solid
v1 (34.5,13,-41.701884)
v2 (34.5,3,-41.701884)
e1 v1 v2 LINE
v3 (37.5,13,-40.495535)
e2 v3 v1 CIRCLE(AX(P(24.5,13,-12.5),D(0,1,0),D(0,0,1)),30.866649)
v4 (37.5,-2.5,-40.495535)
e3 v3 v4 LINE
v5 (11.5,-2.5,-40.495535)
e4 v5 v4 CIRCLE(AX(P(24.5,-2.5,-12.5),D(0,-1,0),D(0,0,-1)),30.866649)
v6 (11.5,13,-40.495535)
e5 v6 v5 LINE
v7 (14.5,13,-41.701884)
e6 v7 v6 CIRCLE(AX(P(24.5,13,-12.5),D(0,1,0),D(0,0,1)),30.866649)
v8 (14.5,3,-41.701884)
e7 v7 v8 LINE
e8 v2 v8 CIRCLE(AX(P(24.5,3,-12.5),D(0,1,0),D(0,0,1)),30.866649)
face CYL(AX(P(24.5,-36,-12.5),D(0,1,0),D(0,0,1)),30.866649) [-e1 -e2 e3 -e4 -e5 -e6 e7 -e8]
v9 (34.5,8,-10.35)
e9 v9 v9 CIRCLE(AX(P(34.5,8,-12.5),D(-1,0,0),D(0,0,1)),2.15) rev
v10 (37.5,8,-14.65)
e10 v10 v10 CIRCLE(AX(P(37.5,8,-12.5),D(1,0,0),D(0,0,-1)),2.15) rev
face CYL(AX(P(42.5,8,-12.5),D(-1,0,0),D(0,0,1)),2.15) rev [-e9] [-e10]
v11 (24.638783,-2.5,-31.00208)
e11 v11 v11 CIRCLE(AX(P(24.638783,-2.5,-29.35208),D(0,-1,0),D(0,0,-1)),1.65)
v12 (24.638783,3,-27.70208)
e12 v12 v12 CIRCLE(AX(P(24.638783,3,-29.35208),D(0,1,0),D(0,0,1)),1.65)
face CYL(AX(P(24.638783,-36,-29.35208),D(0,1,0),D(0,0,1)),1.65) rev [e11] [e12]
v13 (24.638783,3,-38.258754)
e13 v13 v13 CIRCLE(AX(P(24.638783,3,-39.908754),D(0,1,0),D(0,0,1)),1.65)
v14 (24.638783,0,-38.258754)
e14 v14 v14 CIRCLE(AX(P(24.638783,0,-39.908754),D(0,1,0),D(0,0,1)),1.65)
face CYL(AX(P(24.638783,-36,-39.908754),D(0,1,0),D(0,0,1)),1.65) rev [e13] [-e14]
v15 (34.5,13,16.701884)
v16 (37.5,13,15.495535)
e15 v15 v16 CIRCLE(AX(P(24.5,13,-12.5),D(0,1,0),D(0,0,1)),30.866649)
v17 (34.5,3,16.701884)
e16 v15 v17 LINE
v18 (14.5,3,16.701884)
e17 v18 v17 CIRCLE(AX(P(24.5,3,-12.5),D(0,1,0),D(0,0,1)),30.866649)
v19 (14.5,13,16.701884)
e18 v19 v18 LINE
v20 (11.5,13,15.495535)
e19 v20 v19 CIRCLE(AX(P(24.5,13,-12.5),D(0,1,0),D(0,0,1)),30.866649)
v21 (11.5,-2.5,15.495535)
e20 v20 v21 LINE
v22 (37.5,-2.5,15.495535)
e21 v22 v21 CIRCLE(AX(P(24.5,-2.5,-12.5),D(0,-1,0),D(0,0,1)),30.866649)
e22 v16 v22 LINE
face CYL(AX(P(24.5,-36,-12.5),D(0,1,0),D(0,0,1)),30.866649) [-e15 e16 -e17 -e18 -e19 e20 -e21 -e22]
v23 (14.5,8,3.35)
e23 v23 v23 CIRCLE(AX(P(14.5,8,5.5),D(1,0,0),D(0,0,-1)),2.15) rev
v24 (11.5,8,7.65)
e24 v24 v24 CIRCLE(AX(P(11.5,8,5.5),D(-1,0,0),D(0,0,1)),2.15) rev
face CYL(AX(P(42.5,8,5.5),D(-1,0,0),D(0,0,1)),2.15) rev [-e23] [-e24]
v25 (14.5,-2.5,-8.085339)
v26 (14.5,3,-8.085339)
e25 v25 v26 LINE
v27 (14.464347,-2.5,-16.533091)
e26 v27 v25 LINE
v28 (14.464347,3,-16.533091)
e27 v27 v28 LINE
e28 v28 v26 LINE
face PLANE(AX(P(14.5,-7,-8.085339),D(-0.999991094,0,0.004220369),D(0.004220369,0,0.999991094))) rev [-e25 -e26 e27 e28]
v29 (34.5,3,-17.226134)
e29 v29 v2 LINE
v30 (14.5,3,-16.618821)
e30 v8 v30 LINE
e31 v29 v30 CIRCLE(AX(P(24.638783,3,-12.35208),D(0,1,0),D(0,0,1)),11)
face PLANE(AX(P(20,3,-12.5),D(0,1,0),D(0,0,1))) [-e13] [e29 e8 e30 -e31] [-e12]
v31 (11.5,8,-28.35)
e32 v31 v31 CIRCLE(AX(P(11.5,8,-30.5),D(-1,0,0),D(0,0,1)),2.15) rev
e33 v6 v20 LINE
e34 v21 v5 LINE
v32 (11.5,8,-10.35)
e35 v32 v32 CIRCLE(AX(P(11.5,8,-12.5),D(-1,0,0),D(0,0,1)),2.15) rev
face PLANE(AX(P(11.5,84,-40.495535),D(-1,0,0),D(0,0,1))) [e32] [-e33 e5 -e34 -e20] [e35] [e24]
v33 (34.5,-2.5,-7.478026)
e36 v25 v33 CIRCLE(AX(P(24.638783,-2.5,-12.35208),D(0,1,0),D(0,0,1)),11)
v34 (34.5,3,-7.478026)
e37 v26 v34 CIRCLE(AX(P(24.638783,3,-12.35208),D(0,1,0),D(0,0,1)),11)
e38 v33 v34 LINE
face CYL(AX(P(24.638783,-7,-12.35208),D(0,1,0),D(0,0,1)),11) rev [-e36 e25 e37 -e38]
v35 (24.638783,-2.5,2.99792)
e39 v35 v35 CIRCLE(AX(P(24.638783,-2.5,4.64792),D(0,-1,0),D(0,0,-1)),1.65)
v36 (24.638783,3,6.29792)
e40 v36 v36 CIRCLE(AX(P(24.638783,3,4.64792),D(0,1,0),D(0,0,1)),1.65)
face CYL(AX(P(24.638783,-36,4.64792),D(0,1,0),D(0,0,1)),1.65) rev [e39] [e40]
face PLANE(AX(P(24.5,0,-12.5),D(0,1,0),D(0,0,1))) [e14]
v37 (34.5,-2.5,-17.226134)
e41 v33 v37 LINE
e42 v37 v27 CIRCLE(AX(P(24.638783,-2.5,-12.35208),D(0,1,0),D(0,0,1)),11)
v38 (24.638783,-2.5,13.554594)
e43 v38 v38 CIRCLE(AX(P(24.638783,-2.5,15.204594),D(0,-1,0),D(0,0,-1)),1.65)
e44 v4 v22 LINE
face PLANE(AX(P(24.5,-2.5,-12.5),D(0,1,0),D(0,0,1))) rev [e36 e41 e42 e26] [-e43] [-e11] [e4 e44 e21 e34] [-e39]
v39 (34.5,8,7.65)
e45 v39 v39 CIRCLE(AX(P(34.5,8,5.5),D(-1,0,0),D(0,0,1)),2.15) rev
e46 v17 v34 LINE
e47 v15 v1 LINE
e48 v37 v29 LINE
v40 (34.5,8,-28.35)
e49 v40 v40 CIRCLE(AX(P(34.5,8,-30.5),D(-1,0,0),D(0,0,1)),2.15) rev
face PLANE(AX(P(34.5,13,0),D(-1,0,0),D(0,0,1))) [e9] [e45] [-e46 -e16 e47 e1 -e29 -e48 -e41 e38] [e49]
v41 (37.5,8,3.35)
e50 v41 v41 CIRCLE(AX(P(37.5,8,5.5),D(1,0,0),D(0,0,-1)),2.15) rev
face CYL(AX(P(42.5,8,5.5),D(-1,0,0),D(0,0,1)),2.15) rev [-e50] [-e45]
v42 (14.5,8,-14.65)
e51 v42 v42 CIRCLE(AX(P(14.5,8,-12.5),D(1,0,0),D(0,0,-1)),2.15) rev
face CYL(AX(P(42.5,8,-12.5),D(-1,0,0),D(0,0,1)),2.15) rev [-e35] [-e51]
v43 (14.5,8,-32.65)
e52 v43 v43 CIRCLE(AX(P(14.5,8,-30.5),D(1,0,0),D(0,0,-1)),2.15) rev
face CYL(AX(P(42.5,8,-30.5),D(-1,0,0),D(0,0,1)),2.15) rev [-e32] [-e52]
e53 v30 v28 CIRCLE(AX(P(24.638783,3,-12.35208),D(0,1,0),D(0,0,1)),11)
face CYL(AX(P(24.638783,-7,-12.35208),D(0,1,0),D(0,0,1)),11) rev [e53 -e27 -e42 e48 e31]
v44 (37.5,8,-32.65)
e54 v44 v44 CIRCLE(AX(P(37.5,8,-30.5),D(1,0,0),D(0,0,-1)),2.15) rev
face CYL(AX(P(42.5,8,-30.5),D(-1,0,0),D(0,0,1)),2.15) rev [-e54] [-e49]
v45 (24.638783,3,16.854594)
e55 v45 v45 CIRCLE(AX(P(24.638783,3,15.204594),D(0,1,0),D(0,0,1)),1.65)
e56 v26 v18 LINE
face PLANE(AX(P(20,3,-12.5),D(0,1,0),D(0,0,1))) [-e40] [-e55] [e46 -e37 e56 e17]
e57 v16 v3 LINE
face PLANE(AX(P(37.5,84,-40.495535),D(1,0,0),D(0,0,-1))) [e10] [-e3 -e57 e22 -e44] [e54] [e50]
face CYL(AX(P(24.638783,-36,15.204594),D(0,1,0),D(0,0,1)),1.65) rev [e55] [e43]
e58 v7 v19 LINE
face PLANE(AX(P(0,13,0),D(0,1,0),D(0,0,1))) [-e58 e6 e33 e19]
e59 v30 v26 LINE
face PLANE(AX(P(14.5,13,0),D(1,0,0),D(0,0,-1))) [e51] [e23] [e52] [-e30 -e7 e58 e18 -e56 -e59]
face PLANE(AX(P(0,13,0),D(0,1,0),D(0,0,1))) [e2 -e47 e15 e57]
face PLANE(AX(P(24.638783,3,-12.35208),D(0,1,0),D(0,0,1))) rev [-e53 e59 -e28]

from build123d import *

# Parameters (mm, degrees)
SKETCH1_R                = 28
BOSS_EXTRUDE1_DEPTH      = 3
SKETCH2_R                = 1.625
CUT_EXTRUDE1_DEPTH       = 3
BOSS_EXTRUDE4_START      = 3
BOSS_EXTRUDE4_OUTLINE_R  = 1.625
BOSS_EXTRUDE4_DEPTH      = 70
BOSS_EXTRUDE6_DEPTH      = 7
CUT_EXTRUDE13_START      = -10
CUT_EXTRUDE13_DEPTH      = 10
SKETCH14_R               = 6
CUT_EXTRUDE7_DEPTH       = 4
SKETCH15_R               = 5
CUT_EXTRUDE8_DEPTH       = 37
SKETCH17_R               = 2.15
CUT_EXTRUDE10_DEPTH      = 15.8
CUT_EXTRUDE11_DEPTH      = 5
CUT_EXTRUDE12_START      = -3
CUT_EXTRUDE12_DEPTH      = 3
SKETCH21_W               = 20.621892052
SKETCH21_H               = 10
BOSS_EXTRUDE7_DEPTH      = 7
SKETCH23_R               = 2.15
CUT_EXTRUDE17_DEPTH      = 23
SKETCH25_W               = 2
SKETCH25_H               = 4.7
CUT_EXTRUDE19_DEPTH      = 5
SKETCH26_W               = 20.621892052
SKETCH26_H               = 58
CUT_EXTRUDE21_DEPTH      = 5
CUT_EXTRUDE22_DEPTH      = 5
SKETCH41_R               = 1.625
CUT_EXTRUDE23_DEPTH      = 70
CUT_EXTRUDE24_START      = -39
CUT_EXTRUDE24_DEPTH      = 39
BOSS_EXTRUDE12_START     = -3
SKETCH43_R               = 30.866648668
BOSS_EXTRUDE12_DEPTH     = 3
BOSS_EXTRUDE13_DEPTH     = 70
BOSS_EXTRUDE14_DEPTH     = 70
SKETCH47_R               = 1.65
SKETCH47_R_2             = 1.625
CUT_EXTRUDE26_DEPTH      = 39
SKETCH48_R               = 5
CUT_EXTRUDE27_DEPTH      = 39
SKETCH49_R               = 5
CUT_EXTRUDE28_DEPTH      = 10
CUT_EXTRUDE29_START      = -4
SKETCH50_R               = 6
CUT_EXTRUDE29_DEPTH      = 4
SKETCH51_R               = 3
CUT_EXTRUDE30_DEPTH      = 2.5
CUT_EXTRUDE31_DEPTH      = 81
CUT_EXTRUDE31_DEPTH_BACK = 10
BOSS_EXTRUDE15_DEPTH     = 10
CUT_EXTRUDE32_DEPTH      = 28
CUT_EXTRUDE32_DEPTH_BACK = 12
SKETCH54_R               = 2.15
SKETCH55_R               = 1.65
BOSS_EXTRUDE16_DEPTH     = 2.5
CUT_EXTRUDE33_DEPTH      = 10


# Read off the part's stored shape, not the designer's step: Boss-Extrude4, Cut-Extrude13
with BuildPart() as part:
    # Sketch1 → Boss-Extrude1 (new body)
    with BuildSketch(Plane(origin=(0, 0, 0), x_dir=(1, 0, 0), z_dir=(0, 1, 0))):
        with Locations(Location((20, 12.5, 0), (0, 0, 270))):
            Circle(SKETCH1_R)
    extrude(amount=BOSS_EXTRUDE1_DEPTH)

    # Sketch2 → Cut-Extrude1 (cut)
    with BuildSketch(Plane(origin=(0, 3, 0), x_dir=(1, 0, 0), z_dir=(0, 1, 0))):
        with Locations(Location((20, 19.5, 0), (0, 0, 270))):
            Circle(SKETCH2_R)
        with Locations(Location((20, 5.5, 0), (0, 0, 270))):
            Circle(SKETCH2_R)
        with Locations(Location((20, 12.5, 0), (0, 0, 270))):
            Circle(SKETCH2_R)
    extrude(amount=-CUT_EXTRUDE1_DEPTH, mode=Mode.SUBTRACT)

    # Boss-Extrude4 outline → Boss-Extrude4 (add)
    with BuildSketch(Plane(origin=(0, 0, 0), x_dir=(1, 0, 0), z_dir=(0, 1, 0)).offset(BOSS_EXTRUDE4_START)):
        with BuildLine():
            ThreePointArc((3.5, -10.121892052), (48, 12.5), (3.5, 35.121892052))
            Line((3.5, 35.121892052), (3.5, -10.121892052))
        make_face()
        with Locations((20, 5.5)):
            Circle(BOSS_EXTRUDE4_OUTLINE_R, mode=Mode.SUBTRACT)
        with Locations((20, 12.5)):
            Circle(BOSS_EXTRUDE4_OUTLINE_R, mode=Mode.SUBTRACT)
        with Locations((20, 19.5)):
            Circle(BOSS_EXTRUDE4_OUTLINE_R, mode=Mode.SUBTRACT)
    extrude(amount=BOSS_EXTRUDE4_DEPTH)

    # Sketch13 → Boss-Extrude6 (add)
    with BuildSketch(Plane.ZY.offset(-3.5)):
        Polygon((-10, 23), (10, 23), (10.121892052, 23), (10.121892052, 15), (10, 15), (-10, 15), (-10.5, 15), (-10.5, 23), align=None)
    extrude(amount=BOSS_EXTRUDE6_DEPTH)

    # Cut-Extrude13 outline → Cut-Extrude13 (cut)
    with BuildSketch(Plane.ZY.offset(-3.5).offset(CUT_EXTRUDE13_START)):
        with BuildLine():
            Line((-10.5, 33), (-10.5, 23))
            Line((-10.5, 23), (10.121892052, 23))
            Line((10.121892052, 23), (10.121892052, 35.792364821))
            ThreePointArc((10.121892052, 35.792364821), (-1.408923961, 43.405043646), (-10.5, 33))
        make_face()
    extrude(amount=CUT_EXTRUDE13_DEPTH, mode=Mode.SUBTRACT)

    # Sketch14 → Cut-Extrude7 (cut)
    with BuildSketch(Plane.ZY.offset(-3.5)):
        with Locations((-22.981333294, 52.283628291)):
            Circle(SKETCH14_R)
    extrude(amount=-CUT_EXTRUDE7_DEPTH, mode=Mode.SUBTRACT)

    # Sketch15 → Cut-Extrude8 (cut)
    with BuildSketch(Plane.ZY.offset(-7.5)):
        with Locations((-22.981333294, 52.283628291)):
            Circle(SKETCH15_R)
    extrude(amount=-CUT_EXTRUDE8_DEPTH, mode=Mode.SUBTRACT)

    # Sketch17 → Cut-Extrude10 (cut)
    with BuildSketch(Plane.ZY.offset(3.5)):
        with Locations((-5, 18.2)):
            Circle(SKETCH17_R)
        with Locations((5, 18.2)):
            Circle(SKETCH17_R)
    extrude(amount=-CUT_EXTRUDE10_DEPTH, mode=Mode.SUBTRACT)

    # Sketch18 → Cut-Extrude11 (cut)
    with BuildSketch(Plane.ZY.offset(3.5)):
        Polygon((-0.189053974, 23), (1, 23), (1, 18), (-1, 18), (-1, 23), align=None)
    extrude(amount=-CUT_EXTRUDE11_DEPTH, mode=Mode.SUBTRACT)

    # Sketch19 → Cut-Extrude12 (cut)
    with BuildSketch(Plane.ZY.offset(-3.5).offset(CUT_EXTRUDE12_START)):
        with BuildLine():
            Line((10.121892052, 63), (10.121892052, 35.792364821))
            ThreePointArc((10.121892052, 35.792364821), (-1.408923961, 43.405043646), (-10.5, 33))
            Line((-10.5, 33), (-10.5, 62))
            Line((-10.5, 62), (-10.5, 63))
            Line((-10.5, 63), (10.121892052, 63))
        make_face()
    extrude(amount=CUT_EXTRUDE12_DEPTH, mode=Mode.SUBTRACT)

    # Sketch21 → Boss-Extrude7 (add)
    with BuildSketch(Plane.ZY.offset(-3.5)):
        with Locations((-0.189053974, 68)):
            Rectangle(SKETCH21_W, SKETCH21_H)
    extrude(amount=BOSS_EXTRUDE7_DEPTH)

    # Sketch23 → Cut-Extrude17 (cut)
    with BuildSketch(Plane.ZY.offset(3.5)):
        with Locations((-5, 67.7)):
            Circle(SKETCH23_R)
        with Locations((5, 67.7)):
            Circle(SKETCH23_R)
    extrude(amount=-CUT_EXTRUDE17_DEPTH, mode=Mode.SUBTRACT)

    # Sketch25 → Cut-Extrude19 (cut)
    with BuildSketch(Plane.ZY.offset(3.5)):
        with Locations((0, 65.35)):
            Rectangle(SKETCH25_W, SKETCH25_H)
    extrude(amount=-CUT_EXTRUDE19_DEPTH, mode=Mode.SUBTRACT)

    # Sketch26 → Cut-Extrude21 (cut)
    with BuildSketch(Plane.ZY.offset(3.5)):
        with Locations((-0.189053974, 44)):
            Rectangle(SKETCH26_W, SKETCH26_H)
    extrude(amount=-CUT_EXTRUDE21_DEPTH, mode=Mode.SUBTRACT)

    # Sketch27 → Cut-Extrude22 (cut)
    with BuildSketch(Plane.ZY.offset(-6.5)):
        Polygon((10.121892052, 63), (-10.5, 63), (-10.5, 33), (10.121892052, 35.792364821), align=None)
    extrude(amount=-CUT_EXTRUDE22_DEPTH, mode=Mode.SUBTRACT)

    # Sketch41 → Cut-Extrude23 (cut)
    with BuildSketch(Plane(origin=(0, 73, 0), x_dir=(1, 0, 0), z_dir=(0, 1, 0))):
        with BuildLine():
            Line((11.5, 39.178643144), (11.5, 10.5))
            Line((11.5, 10.5), (11.5, -14.178643144))
            ThreePointArc((11.5, -14.178643144), (48, 12.5), (11.5, 39.178643144))
        make_face()
        with Locations(Location((20, 5.5, 0), (0, 0, 270))):
            Circle(SKETCH41_R, mode=Mode.SUBTRACT)
        with Locations(Location((20, 12.5, 0), (0, 0, 270))):
            Circle(SKETCH41_R, mode=Mode.SUBTRACT)
        with Locations(Location((20, 19.5, 0), (0, 0, 270))):
            Circle(SKETCH41_R, mode=Mode.SUBTRACT)
    extrude(amount=-CUT_EXTRUDE23_DEPTH, mode=Mode.SUBTRACT)

    # Sketch42 → Cut-Extrude24 (cut)
    with BuildSketch(Plane(origin=(0, 3, 0), x_dir=(1, 0, 0), z_dir=(0, 1, 0)).offset(CUT_EXTRUDE24_START)):
        with BuildLine():
            ThreePointArc((3.5, 35.121892052), (-6.366648668, 12.5), (3.5, -10.121892052))
            ThreePointArc((3.5, -10.121892052), (-8, 12.5), (3.5, 35.121892052))
        make_face()
    extrude(amount=CUT_EXTRUDE24_DEPTH, mode=Mode.SUBTRACT)

    # Sketch43 → Boss-Extrude12 (add)
    with BuildSketch(Plane(origin=(0, 3, 0), x_dir=(1, 0, 0), z_dir=(0, 1, 0)).offset(BOSS_EXTRUDE12_START)):
        with Locations(Location((24.5, 12.5, 0), (0, 0, 270))):
            Circle(SKETCH43_R)
    extrude(amount=BOSS_EXTRUDE12_DEPTH)

    # Sketch45 → Boss-Extrude13 (add)
    with BuildSketch(Plane(origin=(0, 3, 0), x_dir=(1, 0, 0), z_dir=(0, 1, 0))):
        with BuildLine():
            Line((11.5, 40.495535358), (11.5, 39.178643144))
            ThreePointArc((11.5, 39.178643144), (7.336497035, 37.472698946), (3.5, 35.121892052))
            ThreePointArc((3.5, 35.121892052), (7.288985777, 38.12286068), (11.5, 40.495535358))
        make_face()
        with BuildLine():
            Line((11.5, -14.178643144), (11.5, -15.495535358))
            ThreePointArc((11.5, -15.495535358), (7.288985777, -13.12286068), (3.5, -10.121892052))
            ThreePointArc((3.5, -10.121892052), (7.336497035, -12.472698946), (11.5, -14.178643144))
        make_face()
    extrude(amount=BOSS_EXTRUDE13_DEPTH)

    # Sketch46 → Boss-Extrude14 (add)
    with BuildSketch(Plane(origin=(0, 3, 0), x_dir=(1, 0, 0), z_dir=(0, 1, 0))):
        with BuildLine():
            Line((37.5, 40.495535358), (37.5, 12.5))
            Line((37.5, 12.5), (37.5, -15.495535358))
            ThreePointArc((37.5, -15.495535358), (41.711014223, -13.12286068), (45.5, -10.121892052))
            Line((45.5, -10.121892052), (45.5, 12.5))
            Line((45.5, 12.5), (45.5, 35.121892052))
            ThreePointArc((45.5, 35.121892052), (41.711014223, 38.12286068), (37.5, 40.495535358))
        make_face()
    extrude(amount=BOSS_EXTRUDE14_DEPTH)

    # Sketch47 → Cut-Extrude26 (cut)
    with BuildSketch(Plane(origin=(0, 3, 0), x_dir=(1, 0, 0), z_dir=(0, 1, 0))):
        with Locations(Location((24.638783134, 29.352080003, 0), (0, 0, 270))):
            Circle(SKETCH47_R)
        with Locations(Location((24.638783134, 19.352080003, 0), (0, 0, 270))):
            Circle(SKETCH47_R)
        with Locations(Location((24.638783134, 12.352080003, 0), (0, 0, 270))):
            Circle(SKETCH47_R)
        with Locations(Location((24.638783134, -4.647919997, 0), (0, 0, 270))):
            Circle(SKETCH47_R)
        with Locations(Location((24.638783134, 5.352080003, 0), (0, 0, 270))):
            Circle(SKETCH47_R)
        with Locations(Location((48.503562926, 26.13041704, 0), (0, 0, 270))):
            Circle(SKETCH47_R)
        with Locations(Location((48.503562926, -1.426257034, 0), (0, 0, 270))):
            Circle(SKETCH47_R)
        with Locations(Location((24.638783134, -15.204594071, 0), (0, 0, 270))):
            Circle(SKETCH47_R)
        with Locations(Location((0.774003343, -1.426257034, 0), (0, 0, 270))):
            Circle(SKETCH47_R)
        with Locations(Location((0.774003343, 26.13041704, 0), (0, 0, 270))):
            Circle(SKETCH47_R)
        with Locations(Location((24.638783134, 39.908754076, 0), (0, 0, 270))):
            Circle(SKETCH47_R)
        with Locations(Location((-2.490624188, 12.352080003, 0), (0, 0, 270))):
            Circle(SKETCH47_R_2)
        with Locations(Location((51.768190456, 12.352080003, 0), (0, 0, 270))):
            Circle(SKETCH47_R_2)
        with Locations(Location((31.638783134, 12.352080003, 0), (0, 0, 270))):
            Circle(SKETCH47_R)
        with Locations(Location((17.638783134, 12.352080003, 0), (0, 0, 270))):
            Circle(SKETCH47_R)
    extrude(amount=-CUT_EXTRUDE26_DEPTH, mode=Mode.SUBTRACT)

    # Sketch48 → Cut-Extrude27 (cut)
    with BuildSketch(Plane.ZY.offset(-7.5)):
        with Locations((-22.981333294, 52.283628291)):
            Circle(SKETCH48_R)
    extrude(amount=-CUT_EXTRUDE27_DEPTH, mode=Mode.SUBTRACT)

    # Sketch49 → Cut-Extrude28 (cut)
    with BuildSketch(Plane(origin=(45.5, 0, 0), x_dir=(0, 0, -1), z_dir=(1, 0, 0))):
        with Locations((0, 33)):
            Circle(SKETCH49_R)
    extrude(amount=-CUT_EXTRUDE28_DEPTH, mode=Mode.SUBTRACT)

    # Sketch50 → Cut-Extrude29 (cut)
    with BuildSketch(Plane(origin=(45.5, 0, 0), x_dir=(0, 0, -1), z_dir=(1, 0, 0)).offset(CUT_EXTRUDE29_START)):
        with Locations((0, 33)):
            Circle(SKETCH50_R)
        with Locations(Location((22.981333294, 52.283628291, 0), (0, 0, 180))):
            Circle(SKETCH50_R)
    extrude(amount=CUT_EXTRUDE29_DEPTH, mode=Mode.SUBTRACT)

    # Sketch51 → Cut-Extrude30 (cut)
    with BuildSketch(Plane(origin=(11.5, 0, 0), x_dir=(0, 0, -1), z_dir=(1, 0, 0))):
        with Locations((-5, 18.2)):
            Circle(SKETCH51_R)
        with Locations((5, 18.2)):
            Circle(SKETCH51_R)
        with Locations((-5, 67.7)):
            Circle(SKETCH51_R)
        with Locations((5, 67.7)):
            Circle(SKETCH51_R)
    extrude(amount=-CUT_EXTRUDE30_DEPTH, mode=Mode.SUBTRACT)

    # Sketch52 → Cut-Extrude31 (cut, two sides: drawn at the far end of the back side and taken through both)
    with BuildSketch(Plane(origin=(0, 3, 0), x_dir=(1, 0, 0), z_dir=(0, 1, 0)).offset(-CUT_EXTRUDE31_DEPTH_BACK)):
        with BuildLine():
            Line((11.5, 40.495535358), (11.5, -15.495535358))
            ThreePointArc((11.5, -15.495535358), (-6.366648668, 12.5), (11.5, 40.495535358))
        make_face()
        with BuildLine():
            Line((37.5, 40.495535358), (37.5, -15.495535358))
            ThreePointArc((37.5, -15.495535358), (55.366648668, 12.5), (37.5, 40.495535358))
        make_face()
    extrude(amount=CUT_EXTRUDE31_DEPTH + CUT_EXTRUDE31_DEPTH_BACK, mode=Mode.SUBTRACT)


with BuildPart() as body_2:
    # of the pieces the cut leaves, the one that is kept (cut_extrude31_keep)
    add(part.part.solids().sort_by_distance((11.5, 0, 15.495535358))[0])

    # Sketch53 → Boss-Extrude15 (add)
    with BuildSketch(Plane(origin=(0, 3, 0), x_dir=(1, 0, 0), z_dir=(0, 1, 0))):
        with BuildLine():
            ThreePointArc((14.5, 41.701883501), (12.984192648, 41.138019852), (11.5, 40.495535358))
            Line((11.5, 40.495535358), (11.5, -15.495535358))
            ThreePointArc((11.5, -15.495535358), (12.984192648, -16.138019852), (14.5, -16.701883501))
            Line((14.5, -16.701883501), (14.5, 12.5))
            Line((14.5, 12.5), (14.5, 41.701883501))
        make_face()
        with BuildLine():
            ThreePointArc((37.5, 40.495535358), (36.015807352, 41.138019852), (34.5, 41.701883501))
            Line((34.5, 41.701883501), (34.5, 12.5))
            Line((34.5, 12.5), (34.5, -16.701883501))
            ThreePointArc((34.5, -16.701883501), (36.015807352, -16.138019852), (37.5, -15.495535358))
            Line((37.5, -15.495535358), (37.5, 40.495535358))
        make_face()
    extrude(amount=BOSS_EXTRUDE15_DEPTH)

    # Sketch54 → Cut-Extrude32 (cut, two sides: drawn at the far end of the back side and taken through both)
    with BuildSketch(Plane(origin=(14.5, 0, 0), x_dir=(0, 0, -1), z_dir=(1, 0, 0)).offset(-CUT_EXTRUDE32_DEPTH_BACK)):
        with Locations(Location((-5.5, 8, 0), (0, 0, 180))):
            Circle(SKETCH54_R)
        with Locations(Location((12.5, 8, 0), (0, 0, 180))):
            Circle(SKETCH54_R)
        with Locations(Location((30.5, 8, 0), (0, 0, 180))):
            Circle(SKETCH54_R)
    extrude(amount=CUT_EXTRUDE32_DEPTH + CUT_EXTRUDE32_DEPTH_BACK, mode=Mode.SUBTRACT)

    # Sketch55 → Boss-Extrude16 (add)
    with BuildSketch(Plane.XZ):
        with BuildLine():
            Line((11.5, 15.495535358), (11.5, -40.495535358))
            ThreePointArc((11.5, -40.495535358), (24.5, -43.366648668), (37.5, -40.495535358))
            Line((37.5, -40.495535358), (37.5, 15.495535358))
            ThreePointArc((37.5, 15.495535358), (24.5, 18.366648668), (11.5, 15.495535358))
        make_face()
        with Locations(Location((17.638783134, -12.352080003, 0), (0, 0, 90))):
            Circle(SKETCH55_R, mode=Mode.SUBTRACT)
        with Locations(Location((24.638783134, 15.204594071, 0), (0, 0, 90))):
            Circle(SKETCH55_R, mode=Mode.SUBTRACT)
        with Locations(Location((24.638783134, 4.647919997, 0), (0, 0, 90))):
            Circle(SKETCH55_R, mode=Mode.SUBTRACT)
        with Locations(Location((24.638783134, -5.352080003, 0), (0, 0, 90))):
            Circle(SKETCH55_R, mode=Mode.SUBTRACT)
        with Locations(Location((24.638783134, -12.352080003, 0), (0, 0, 90))):
            Circle(SKETCH55_R, mode=Mode.SUBTRACT)
        with Locations(Location((31.638783134, -12.352080003, 0), (0, 0, 90))):
            Circle(SKETCH55_R, mode=Mode.SUBTRACT)
        with Locations(Location((24.638783134, -19.352080003, 0), (0, 0, 90))):
            Circle(SKETCH55_R, mode=Mode.SUBTRACT)
        with Locations(Location((24.638783134, -29.352080003, 0), (0, 0, 90))):
            Circle(SKETCH55_R, mode=Mode.SUBTRACT)
    extrude(amount=BOSS_EXTRUDE16_DEPTH)

    # Sketch56 → Cut-Extrude33 (cut)
    with BuildSketch(Plane(origin=(0, 3, 0), x_dir=(1, 0, 0), z_dir=(0, 1, 0))):
        with BuildLine():
            Line((14.5, 8.085339261), (14.464347058, 16.533090711))
            ThreePointArc((14.464347058, 16.533090711), (24.258515067, 23.345505138), (34.5, 17.226133955))
            Line((34.5, 17.226133955), (34.5, 7.478026051))
            ThreePointArc((34.5, 7.478026051), (24.304914759, 1.357147902), (14.5, 8.085339261))
        make_face()
    extrude(amount=-CUT_EXTRUDE33_DEPTH, mode=Mode.SUBTRACT)


solid = body_2.part
